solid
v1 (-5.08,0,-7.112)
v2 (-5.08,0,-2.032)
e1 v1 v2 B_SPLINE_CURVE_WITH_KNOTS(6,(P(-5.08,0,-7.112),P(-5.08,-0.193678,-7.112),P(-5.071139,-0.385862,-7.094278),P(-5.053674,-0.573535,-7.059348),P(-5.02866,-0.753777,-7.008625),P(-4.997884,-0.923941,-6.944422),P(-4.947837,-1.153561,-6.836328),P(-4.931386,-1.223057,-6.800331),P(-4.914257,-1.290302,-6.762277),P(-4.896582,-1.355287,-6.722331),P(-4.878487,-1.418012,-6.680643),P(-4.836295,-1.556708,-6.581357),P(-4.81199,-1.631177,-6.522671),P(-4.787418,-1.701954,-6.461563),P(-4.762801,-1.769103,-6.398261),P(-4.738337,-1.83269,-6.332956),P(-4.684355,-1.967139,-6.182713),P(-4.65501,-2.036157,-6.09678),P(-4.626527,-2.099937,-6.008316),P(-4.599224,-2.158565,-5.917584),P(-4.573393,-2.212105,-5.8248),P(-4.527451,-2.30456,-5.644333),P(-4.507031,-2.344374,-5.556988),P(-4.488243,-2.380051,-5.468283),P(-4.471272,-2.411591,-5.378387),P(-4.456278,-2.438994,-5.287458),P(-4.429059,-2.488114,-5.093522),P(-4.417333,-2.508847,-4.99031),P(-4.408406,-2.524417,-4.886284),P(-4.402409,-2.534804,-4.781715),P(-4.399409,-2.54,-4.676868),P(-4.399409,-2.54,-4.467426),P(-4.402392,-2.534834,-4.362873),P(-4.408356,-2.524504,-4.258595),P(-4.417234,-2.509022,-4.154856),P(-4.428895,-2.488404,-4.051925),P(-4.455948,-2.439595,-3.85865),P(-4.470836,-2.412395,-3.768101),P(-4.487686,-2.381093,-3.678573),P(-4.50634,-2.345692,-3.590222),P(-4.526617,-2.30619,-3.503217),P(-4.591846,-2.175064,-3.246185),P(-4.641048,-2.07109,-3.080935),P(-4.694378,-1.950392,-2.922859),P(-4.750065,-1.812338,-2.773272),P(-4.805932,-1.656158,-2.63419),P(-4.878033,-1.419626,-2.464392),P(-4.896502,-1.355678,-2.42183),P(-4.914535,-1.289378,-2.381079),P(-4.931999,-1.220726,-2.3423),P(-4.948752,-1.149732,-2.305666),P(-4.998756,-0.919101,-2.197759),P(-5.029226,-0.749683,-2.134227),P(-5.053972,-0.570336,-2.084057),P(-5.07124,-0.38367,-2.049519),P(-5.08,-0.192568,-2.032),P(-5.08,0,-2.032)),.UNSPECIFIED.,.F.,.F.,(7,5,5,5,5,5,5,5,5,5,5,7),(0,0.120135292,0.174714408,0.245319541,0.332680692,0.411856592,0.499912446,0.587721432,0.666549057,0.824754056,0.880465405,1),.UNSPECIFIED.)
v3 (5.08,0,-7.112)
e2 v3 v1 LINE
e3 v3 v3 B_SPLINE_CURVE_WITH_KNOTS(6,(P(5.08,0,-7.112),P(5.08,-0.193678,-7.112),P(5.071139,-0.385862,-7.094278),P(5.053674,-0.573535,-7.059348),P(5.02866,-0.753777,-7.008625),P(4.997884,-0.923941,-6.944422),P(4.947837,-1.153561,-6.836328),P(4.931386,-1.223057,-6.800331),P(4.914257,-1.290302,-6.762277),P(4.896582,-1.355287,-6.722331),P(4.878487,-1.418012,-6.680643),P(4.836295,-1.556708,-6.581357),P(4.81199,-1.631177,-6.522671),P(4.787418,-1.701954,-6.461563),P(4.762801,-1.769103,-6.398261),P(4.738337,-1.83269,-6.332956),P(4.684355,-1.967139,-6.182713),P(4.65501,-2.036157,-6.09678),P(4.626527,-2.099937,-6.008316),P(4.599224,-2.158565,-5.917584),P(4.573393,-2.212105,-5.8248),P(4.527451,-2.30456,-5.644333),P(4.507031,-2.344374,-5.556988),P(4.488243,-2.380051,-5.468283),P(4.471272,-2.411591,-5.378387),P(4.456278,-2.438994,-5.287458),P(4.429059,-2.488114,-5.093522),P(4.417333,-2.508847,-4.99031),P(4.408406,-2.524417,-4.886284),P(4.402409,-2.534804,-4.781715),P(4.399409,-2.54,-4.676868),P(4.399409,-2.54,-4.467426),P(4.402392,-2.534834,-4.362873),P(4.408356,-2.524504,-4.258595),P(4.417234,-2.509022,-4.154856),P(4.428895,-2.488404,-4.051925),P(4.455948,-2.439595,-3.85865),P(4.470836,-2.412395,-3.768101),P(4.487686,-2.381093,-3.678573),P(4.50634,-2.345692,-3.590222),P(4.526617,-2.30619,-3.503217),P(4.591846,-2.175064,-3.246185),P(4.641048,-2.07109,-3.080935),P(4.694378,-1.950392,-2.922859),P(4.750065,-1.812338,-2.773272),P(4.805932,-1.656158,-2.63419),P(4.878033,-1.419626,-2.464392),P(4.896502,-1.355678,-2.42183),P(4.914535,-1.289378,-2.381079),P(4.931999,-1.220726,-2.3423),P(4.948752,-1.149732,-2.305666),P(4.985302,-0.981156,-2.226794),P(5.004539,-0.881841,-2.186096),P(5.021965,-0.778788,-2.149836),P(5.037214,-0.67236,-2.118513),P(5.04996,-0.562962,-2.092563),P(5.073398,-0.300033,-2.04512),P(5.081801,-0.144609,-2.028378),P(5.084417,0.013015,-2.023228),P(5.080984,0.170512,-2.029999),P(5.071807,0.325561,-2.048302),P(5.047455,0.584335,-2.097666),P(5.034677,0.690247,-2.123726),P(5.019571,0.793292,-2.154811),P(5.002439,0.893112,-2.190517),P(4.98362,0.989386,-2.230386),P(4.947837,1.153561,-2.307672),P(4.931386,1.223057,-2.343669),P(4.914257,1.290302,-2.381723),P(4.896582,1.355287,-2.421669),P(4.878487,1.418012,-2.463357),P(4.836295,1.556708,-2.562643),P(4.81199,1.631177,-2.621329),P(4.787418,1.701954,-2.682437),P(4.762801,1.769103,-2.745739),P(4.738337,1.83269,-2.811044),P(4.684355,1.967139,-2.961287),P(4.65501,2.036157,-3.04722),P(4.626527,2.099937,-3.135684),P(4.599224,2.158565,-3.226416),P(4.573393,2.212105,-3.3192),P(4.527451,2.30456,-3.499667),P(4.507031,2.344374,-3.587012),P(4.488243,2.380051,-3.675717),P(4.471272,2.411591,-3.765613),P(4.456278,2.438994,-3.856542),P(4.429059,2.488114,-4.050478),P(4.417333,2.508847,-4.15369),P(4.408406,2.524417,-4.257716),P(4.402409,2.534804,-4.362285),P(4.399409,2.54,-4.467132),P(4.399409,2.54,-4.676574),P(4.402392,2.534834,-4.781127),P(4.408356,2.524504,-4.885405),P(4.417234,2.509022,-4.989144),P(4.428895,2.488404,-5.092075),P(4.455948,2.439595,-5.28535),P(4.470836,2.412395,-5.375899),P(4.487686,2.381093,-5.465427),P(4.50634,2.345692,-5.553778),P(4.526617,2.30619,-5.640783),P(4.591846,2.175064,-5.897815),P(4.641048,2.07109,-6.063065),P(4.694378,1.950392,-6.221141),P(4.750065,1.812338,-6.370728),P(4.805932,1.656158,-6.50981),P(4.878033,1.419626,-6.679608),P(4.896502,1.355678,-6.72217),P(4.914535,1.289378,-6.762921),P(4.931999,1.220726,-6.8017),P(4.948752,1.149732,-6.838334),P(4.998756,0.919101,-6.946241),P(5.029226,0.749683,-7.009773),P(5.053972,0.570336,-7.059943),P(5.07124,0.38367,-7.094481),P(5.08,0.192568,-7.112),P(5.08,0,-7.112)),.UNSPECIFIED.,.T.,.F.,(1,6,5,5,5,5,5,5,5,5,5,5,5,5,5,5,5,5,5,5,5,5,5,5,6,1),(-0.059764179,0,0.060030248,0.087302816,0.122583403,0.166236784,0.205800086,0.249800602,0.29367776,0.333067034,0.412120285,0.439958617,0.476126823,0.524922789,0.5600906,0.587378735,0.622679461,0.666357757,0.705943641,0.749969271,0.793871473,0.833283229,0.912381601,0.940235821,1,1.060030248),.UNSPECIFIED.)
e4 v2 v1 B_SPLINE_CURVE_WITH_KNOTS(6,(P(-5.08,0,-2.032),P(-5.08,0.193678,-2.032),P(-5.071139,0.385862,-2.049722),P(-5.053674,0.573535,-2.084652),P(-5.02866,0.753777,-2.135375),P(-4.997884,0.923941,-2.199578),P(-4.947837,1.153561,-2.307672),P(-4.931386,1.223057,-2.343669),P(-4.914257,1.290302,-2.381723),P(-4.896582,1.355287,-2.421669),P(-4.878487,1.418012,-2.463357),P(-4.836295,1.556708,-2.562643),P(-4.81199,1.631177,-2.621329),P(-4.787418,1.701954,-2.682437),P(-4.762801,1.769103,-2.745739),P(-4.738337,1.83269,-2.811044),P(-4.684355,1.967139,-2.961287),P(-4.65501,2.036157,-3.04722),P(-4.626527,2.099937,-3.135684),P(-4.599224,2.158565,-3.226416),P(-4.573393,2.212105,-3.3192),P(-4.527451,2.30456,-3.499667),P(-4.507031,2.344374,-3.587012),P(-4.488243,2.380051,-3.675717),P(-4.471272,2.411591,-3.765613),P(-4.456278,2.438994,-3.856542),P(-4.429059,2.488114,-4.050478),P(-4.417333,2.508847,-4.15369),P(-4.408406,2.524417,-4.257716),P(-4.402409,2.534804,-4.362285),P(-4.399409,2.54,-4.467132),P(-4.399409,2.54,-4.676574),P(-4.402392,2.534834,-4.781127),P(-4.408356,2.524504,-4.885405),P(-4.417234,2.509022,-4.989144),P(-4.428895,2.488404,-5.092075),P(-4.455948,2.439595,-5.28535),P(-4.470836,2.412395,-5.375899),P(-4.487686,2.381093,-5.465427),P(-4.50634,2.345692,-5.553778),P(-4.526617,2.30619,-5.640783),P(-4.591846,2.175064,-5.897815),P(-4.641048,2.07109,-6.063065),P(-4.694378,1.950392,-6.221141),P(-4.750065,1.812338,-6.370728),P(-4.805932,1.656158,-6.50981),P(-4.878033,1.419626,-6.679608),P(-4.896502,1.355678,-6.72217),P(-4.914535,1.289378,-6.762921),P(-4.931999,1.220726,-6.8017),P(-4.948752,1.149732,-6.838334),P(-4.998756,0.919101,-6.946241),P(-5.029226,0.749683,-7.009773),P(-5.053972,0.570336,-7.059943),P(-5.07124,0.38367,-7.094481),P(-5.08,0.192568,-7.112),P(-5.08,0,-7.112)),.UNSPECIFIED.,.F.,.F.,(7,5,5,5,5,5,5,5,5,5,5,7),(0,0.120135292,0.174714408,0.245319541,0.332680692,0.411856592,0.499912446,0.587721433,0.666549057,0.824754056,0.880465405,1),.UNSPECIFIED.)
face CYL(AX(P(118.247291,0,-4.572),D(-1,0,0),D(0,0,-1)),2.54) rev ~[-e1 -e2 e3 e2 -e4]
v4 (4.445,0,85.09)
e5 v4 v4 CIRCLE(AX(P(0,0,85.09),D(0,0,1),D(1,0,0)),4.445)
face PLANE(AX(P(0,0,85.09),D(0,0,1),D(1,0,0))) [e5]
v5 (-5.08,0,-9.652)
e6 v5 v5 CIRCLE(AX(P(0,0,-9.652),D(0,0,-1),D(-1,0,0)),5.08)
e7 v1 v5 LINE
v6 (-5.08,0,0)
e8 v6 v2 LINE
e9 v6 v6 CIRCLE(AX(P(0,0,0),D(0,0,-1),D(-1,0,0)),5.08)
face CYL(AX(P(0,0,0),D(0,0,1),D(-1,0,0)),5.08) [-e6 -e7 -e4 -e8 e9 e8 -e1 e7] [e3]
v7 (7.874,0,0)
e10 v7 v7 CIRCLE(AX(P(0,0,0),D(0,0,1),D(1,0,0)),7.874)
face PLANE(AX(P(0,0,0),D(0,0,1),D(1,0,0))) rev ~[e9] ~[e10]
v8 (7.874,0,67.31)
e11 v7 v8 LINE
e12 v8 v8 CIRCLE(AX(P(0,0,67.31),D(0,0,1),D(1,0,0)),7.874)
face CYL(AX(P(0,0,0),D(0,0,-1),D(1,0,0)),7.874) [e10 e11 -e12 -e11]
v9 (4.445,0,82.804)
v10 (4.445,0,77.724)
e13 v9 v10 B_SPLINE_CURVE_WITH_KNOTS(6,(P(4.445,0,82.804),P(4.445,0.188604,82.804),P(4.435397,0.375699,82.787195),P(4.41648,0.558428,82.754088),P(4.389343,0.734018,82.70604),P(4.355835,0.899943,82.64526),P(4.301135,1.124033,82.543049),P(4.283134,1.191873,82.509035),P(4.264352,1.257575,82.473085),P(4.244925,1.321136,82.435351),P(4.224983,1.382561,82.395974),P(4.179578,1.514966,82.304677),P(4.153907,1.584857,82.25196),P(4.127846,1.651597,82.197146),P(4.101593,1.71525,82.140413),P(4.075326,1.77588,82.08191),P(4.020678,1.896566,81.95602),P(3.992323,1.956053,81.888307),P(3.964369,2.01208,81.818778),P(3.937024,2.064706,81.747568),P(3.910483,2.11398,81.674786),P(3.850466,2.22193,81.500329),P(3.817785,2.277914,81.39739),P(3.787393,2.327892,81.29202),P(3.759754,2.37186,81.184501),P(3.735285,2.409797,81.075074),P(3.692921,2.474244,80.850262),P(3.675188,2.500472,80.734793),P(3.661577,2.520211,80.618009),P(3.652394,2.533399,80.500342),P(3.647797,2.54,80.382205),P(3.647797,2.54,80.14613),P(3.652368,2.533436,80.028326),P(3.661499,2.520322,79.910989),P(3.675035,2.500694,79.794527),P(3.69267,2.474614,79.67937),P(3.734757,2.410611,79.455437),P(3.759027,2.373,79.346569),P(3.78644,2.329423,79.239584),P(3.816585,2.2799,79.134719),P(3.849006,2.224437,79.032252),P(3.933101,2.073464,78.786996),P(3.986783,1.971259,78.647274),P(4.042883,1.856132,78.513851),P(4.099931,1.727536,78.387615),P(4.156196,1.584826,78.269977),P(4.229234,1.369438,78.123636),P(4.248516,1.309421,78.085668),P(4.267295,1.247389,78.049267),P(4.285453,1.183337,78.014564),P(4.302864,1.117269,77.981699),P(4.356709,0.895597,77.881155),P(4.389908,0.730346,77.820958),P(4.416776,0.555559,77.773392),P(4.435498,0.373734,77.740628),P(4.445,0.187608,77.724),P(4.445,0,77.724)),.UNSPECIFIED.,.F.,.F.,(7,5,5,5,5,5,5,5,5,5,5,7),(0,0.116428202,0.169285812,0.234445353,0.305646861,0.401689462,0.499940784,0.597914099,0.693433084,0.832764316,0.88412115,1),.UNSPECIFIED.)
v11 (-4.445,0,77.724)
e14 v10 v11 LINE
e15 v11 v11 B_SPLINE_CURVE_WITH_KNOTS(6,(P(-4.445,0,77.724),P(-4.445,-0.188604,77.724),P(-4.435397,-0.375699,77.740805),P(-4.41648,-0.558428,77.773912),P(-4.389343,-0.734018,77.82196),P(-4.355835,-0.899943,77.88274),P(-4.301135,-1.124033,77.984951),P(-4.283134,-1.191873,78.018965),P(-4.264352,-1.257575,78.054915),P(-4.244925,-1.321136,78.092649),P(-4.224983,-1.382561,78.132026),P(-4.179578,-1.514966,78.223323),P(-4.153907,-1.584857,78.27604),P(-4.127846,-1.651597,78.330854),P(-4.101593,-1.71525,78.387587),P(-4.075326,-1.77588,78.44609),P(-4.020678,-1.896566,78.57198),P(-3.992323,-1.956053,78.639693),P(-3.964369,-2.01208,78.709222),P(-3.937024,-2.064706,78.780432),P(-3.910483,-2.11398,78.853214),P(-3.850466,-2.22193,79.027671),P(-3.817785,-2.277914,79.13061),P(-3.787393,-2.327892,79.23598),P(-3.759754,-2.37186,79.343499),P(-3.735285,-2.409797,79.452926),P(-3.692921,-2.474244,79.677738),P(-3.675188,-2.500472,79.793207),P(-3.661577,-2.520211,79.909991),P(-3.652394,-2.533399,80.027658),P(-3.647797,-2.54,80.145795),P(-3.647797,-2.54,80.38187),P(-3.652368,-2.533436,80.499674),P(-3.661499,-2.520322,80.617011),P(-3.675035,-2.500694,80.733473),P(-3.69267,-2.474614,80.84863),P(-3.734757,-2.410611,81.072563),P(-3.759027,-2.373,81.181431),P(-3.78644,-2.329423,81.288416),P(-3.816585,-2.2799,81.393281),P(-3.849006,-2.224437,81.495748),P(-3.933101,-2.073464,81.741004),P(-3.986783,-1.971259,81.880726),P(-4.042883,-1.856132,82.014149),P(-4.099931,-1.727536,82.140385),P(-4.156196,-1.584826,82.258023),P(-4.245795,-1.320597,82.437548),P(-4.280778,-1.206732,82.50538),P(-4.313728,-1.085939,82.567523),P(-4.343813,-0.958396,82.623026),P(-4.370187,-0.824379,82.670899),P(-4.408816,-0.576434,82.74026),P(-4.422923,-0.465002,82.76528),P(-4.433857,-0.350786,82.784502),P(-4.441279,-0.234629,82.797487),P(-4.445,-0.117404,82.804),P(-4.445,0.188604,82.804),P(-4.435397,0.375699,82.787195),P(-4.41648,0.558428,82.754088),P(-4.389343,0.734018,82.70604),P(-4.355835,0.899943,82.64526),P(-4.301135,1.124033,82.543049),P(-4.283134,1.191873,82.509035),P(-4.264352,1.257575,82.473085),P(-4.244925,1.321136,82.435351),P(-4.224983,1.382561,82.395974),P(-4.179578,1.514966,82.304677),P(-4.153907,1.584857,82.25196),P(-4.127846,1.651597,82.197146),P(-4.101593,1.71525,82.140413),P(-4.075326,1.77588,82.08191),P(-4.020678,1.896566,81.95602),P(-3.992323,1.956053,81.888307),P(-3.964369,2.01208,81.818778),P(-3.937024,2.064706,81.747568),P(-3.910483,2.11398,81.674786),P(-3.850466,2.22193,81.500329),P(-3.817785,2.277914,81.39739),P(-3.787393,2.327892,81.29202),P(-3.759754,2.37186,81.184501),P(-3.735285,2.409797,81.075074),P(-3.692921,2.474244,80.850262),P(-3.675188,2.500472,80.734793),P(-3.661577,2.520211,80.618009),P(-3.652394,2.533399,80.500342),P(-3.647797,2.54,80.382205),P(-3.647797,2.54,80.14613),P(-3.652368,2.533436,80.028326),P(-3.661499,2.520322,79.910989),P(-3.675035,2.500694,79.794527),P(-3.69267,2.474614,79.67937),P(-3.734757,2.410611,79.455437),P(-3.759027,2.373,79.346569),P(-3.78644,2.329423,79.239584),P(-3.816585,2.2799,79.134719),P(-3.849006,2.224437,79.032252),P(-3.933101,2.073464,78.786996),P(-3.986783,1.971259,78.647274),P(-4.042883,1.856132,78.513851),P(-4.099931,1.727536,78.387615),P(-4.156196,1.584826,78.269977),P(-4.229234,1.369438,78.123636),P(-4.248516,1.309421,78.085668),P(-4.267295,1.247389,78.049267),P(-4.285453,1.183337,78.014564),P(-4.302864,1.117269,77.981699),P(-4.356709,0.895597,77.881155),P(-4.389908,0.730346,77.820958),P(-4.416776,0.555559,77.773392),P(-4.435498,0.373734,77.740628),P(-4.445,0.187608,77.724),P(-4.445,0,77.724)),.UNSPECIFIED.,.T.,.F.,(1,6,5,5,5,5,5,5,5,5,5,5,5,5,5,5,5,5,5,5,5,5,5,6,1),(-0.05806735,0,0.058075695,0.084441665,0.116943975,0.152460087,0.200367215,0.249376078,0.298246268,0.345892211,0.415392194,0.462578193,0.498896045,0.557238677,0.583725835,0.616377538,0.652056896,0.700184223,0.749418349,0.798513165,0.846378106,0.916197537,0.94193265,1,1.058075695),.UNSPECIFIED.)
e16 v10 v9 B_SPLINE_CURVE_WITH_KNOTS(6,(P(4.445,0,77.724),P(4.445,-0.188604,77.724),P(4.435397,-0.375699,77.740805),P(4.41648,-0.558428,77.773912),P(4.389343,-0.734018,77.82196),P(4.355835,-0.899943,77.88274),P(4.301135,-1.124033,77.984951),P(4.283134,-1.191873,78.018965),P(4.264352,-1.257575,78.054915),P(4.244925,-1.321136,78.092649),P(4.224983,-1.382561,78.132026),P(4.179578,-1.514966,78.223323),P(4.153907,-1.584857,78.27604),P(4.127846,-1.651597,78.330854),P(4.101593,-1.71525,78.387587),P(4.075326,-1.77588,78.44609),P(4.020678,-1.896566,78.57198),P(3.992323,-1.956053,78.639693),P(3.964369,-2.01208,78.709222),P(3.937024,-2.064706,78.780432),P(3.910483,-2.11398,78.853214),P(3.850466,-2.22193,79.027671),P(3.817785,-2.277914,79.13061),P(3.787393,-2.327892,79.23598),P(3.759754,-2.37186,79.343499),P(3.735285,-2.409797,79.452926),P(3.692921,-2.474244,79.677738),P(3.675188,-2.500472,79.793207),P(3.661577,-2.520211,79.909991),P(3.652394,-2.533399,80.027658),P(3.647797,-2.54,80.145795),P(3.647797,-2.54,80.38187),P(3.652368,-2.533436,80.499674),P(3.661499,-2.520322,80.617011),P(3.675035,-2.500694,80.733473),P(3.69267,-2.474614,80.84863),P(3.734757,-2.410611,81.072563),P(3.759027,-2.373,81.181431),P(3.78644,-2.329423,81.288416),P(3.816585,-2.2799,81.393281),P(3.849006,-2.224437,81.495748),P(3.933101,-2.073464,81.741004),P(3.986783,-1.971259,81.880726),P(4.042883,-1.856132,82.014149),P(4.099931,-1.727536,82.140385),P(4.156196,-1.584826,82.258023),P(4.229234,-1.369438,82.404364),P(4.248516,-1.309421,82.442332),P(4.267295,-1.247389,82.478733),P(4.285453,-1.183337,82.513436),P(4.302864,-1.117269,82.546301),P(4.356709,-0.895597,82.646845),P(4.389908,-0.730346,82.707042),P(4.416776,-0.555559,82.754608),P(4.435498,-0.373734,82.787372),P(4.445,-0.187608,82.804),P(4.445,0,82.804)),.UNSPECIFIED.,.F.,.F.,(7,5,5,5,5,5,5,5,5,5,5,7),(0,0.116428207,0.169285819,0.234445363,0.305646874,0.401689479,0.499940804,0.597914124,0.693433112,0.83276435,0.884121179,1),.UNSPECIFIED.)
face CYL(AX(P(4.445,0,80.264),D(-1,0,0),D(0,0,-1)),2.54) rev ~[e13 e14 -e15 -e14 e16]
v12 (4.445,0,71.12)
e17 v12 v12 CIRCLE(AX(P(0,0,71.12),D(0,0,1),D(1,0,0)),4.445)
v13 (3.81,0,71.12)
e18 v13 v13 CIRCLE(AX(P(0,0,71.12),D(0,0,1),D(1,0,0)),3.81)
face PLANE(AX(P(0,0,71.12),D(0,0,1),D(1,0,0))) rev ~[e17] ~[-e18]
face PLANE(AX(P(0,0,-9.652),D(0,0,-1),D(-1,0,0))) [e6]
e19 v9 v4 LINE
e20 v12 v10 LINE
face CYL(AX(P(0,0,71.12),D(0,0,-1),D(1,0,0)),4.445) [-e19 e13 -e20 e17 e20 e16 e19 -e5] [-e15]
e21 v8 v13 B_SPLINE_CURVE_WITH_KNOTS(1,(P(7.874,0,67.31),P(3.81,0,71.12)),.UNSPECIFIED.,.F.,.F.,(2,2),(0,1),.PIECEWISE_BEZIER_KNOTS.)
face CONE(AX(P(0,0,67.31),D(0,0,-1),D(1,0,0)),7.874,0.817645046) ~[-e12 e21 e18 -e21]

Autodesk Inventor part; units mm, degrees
ref_plane "YZ Plane" through (0, 0, 0) normal (1, 0, 0) x (0, 1, 0)
ref_plane "XZ Plane" through (0, 0, 0) normal (0, 1, 0) x (-1, 0, 0)
ref_plane "XY Plane" through (0, 0, 0) normal (0, 0, 1) x (1, 0, 0)
sketch "Sketch1" plane through (0, 0, 0) normal (0, 0, 1) x (1, 0, 0)
  circle A0 centre (0, 0) radius 7.874
  dimension "d0" = 15.748
extrude "Extrusion1" add sketch "Sketch1" along normal blind 67.31
ref_plane "Work Plane1" through (0, 0, 71.12) normal (0, 0, 1) x (1, 0, 0)
sketch "Sketch3" plane through (0, 0, 71.12) normal (0, 0, 1) x (1, 0, 0)
  circle A0 centre (0, 0) radius 3.81
  dimension "d4" = 7.62
loft "Loft1" add profiles "Sketch3" section 1 edges at (-7.874, 0, 67.31)
sketch "Sketch4" plane through (0, 0, 71.12) normal (0, 0, 1) x (1, 0, 0)
  circle A0 centre (0, 0) radius 3.81 projected
  circle A1 centre (0, 0) radius 4.445
  dimension "d9" = 8.89
extrude "Extrusion2" add sketch "Sketch4" along normal blind 13.97 contours A0 | A1
sketch "Sketch5" plane through (0, 0, 85.09) normal (0, 0, 1) x (1, 0, 0)
  circle A0 centre (0, 0) radius 4.445 projected
  point P0 (4.445, 0)
ref_plane "Work Plane2" through (4.445, 0, 85.09) normal (1, 0, 0) x (0, 1, 0)
sketch "Sketch6" plane through (4.445, 0, 85.09) normal (1, 0, 0) x (0, 1, 0)
  line L0 (4.445, 0) -> (-4.445, 0) projected
  point P0 (0, -85.09)
  point P1 (0, -4.826)
  dimension "d23" = 4.826
sketch "Sketch7" plane through (0, 0, 0) normal (0, 0, -1) x (-1, 0, 0)
  circle A0 centre (0, 0) radius 5.08
  dimension "d16" = 10.16
extrude "Extrusion4" add sketch "Sketch7" along normal blind 9.652
sketch "Sketch8" plane through (4.445, 0, 85.09) normal (1, 0, 0) x (0, 1, 0)
  line L0 (-5.08, -94.742) -> (5.08, -94.742) projected
  point P0 (0, -85.09)
  point P1 (0, -89.662)
  dimension "d31" = 5.08
hole "Hole1" at (4.445, 0, 80.264) direction (-1, 0, 0) diameter 5.08 end through all
hole "Hole2" at (4.445, 0, -4.572) direction (-1, 0, 0) diameter 5.08 end through all both
properties part number "MockShock"
